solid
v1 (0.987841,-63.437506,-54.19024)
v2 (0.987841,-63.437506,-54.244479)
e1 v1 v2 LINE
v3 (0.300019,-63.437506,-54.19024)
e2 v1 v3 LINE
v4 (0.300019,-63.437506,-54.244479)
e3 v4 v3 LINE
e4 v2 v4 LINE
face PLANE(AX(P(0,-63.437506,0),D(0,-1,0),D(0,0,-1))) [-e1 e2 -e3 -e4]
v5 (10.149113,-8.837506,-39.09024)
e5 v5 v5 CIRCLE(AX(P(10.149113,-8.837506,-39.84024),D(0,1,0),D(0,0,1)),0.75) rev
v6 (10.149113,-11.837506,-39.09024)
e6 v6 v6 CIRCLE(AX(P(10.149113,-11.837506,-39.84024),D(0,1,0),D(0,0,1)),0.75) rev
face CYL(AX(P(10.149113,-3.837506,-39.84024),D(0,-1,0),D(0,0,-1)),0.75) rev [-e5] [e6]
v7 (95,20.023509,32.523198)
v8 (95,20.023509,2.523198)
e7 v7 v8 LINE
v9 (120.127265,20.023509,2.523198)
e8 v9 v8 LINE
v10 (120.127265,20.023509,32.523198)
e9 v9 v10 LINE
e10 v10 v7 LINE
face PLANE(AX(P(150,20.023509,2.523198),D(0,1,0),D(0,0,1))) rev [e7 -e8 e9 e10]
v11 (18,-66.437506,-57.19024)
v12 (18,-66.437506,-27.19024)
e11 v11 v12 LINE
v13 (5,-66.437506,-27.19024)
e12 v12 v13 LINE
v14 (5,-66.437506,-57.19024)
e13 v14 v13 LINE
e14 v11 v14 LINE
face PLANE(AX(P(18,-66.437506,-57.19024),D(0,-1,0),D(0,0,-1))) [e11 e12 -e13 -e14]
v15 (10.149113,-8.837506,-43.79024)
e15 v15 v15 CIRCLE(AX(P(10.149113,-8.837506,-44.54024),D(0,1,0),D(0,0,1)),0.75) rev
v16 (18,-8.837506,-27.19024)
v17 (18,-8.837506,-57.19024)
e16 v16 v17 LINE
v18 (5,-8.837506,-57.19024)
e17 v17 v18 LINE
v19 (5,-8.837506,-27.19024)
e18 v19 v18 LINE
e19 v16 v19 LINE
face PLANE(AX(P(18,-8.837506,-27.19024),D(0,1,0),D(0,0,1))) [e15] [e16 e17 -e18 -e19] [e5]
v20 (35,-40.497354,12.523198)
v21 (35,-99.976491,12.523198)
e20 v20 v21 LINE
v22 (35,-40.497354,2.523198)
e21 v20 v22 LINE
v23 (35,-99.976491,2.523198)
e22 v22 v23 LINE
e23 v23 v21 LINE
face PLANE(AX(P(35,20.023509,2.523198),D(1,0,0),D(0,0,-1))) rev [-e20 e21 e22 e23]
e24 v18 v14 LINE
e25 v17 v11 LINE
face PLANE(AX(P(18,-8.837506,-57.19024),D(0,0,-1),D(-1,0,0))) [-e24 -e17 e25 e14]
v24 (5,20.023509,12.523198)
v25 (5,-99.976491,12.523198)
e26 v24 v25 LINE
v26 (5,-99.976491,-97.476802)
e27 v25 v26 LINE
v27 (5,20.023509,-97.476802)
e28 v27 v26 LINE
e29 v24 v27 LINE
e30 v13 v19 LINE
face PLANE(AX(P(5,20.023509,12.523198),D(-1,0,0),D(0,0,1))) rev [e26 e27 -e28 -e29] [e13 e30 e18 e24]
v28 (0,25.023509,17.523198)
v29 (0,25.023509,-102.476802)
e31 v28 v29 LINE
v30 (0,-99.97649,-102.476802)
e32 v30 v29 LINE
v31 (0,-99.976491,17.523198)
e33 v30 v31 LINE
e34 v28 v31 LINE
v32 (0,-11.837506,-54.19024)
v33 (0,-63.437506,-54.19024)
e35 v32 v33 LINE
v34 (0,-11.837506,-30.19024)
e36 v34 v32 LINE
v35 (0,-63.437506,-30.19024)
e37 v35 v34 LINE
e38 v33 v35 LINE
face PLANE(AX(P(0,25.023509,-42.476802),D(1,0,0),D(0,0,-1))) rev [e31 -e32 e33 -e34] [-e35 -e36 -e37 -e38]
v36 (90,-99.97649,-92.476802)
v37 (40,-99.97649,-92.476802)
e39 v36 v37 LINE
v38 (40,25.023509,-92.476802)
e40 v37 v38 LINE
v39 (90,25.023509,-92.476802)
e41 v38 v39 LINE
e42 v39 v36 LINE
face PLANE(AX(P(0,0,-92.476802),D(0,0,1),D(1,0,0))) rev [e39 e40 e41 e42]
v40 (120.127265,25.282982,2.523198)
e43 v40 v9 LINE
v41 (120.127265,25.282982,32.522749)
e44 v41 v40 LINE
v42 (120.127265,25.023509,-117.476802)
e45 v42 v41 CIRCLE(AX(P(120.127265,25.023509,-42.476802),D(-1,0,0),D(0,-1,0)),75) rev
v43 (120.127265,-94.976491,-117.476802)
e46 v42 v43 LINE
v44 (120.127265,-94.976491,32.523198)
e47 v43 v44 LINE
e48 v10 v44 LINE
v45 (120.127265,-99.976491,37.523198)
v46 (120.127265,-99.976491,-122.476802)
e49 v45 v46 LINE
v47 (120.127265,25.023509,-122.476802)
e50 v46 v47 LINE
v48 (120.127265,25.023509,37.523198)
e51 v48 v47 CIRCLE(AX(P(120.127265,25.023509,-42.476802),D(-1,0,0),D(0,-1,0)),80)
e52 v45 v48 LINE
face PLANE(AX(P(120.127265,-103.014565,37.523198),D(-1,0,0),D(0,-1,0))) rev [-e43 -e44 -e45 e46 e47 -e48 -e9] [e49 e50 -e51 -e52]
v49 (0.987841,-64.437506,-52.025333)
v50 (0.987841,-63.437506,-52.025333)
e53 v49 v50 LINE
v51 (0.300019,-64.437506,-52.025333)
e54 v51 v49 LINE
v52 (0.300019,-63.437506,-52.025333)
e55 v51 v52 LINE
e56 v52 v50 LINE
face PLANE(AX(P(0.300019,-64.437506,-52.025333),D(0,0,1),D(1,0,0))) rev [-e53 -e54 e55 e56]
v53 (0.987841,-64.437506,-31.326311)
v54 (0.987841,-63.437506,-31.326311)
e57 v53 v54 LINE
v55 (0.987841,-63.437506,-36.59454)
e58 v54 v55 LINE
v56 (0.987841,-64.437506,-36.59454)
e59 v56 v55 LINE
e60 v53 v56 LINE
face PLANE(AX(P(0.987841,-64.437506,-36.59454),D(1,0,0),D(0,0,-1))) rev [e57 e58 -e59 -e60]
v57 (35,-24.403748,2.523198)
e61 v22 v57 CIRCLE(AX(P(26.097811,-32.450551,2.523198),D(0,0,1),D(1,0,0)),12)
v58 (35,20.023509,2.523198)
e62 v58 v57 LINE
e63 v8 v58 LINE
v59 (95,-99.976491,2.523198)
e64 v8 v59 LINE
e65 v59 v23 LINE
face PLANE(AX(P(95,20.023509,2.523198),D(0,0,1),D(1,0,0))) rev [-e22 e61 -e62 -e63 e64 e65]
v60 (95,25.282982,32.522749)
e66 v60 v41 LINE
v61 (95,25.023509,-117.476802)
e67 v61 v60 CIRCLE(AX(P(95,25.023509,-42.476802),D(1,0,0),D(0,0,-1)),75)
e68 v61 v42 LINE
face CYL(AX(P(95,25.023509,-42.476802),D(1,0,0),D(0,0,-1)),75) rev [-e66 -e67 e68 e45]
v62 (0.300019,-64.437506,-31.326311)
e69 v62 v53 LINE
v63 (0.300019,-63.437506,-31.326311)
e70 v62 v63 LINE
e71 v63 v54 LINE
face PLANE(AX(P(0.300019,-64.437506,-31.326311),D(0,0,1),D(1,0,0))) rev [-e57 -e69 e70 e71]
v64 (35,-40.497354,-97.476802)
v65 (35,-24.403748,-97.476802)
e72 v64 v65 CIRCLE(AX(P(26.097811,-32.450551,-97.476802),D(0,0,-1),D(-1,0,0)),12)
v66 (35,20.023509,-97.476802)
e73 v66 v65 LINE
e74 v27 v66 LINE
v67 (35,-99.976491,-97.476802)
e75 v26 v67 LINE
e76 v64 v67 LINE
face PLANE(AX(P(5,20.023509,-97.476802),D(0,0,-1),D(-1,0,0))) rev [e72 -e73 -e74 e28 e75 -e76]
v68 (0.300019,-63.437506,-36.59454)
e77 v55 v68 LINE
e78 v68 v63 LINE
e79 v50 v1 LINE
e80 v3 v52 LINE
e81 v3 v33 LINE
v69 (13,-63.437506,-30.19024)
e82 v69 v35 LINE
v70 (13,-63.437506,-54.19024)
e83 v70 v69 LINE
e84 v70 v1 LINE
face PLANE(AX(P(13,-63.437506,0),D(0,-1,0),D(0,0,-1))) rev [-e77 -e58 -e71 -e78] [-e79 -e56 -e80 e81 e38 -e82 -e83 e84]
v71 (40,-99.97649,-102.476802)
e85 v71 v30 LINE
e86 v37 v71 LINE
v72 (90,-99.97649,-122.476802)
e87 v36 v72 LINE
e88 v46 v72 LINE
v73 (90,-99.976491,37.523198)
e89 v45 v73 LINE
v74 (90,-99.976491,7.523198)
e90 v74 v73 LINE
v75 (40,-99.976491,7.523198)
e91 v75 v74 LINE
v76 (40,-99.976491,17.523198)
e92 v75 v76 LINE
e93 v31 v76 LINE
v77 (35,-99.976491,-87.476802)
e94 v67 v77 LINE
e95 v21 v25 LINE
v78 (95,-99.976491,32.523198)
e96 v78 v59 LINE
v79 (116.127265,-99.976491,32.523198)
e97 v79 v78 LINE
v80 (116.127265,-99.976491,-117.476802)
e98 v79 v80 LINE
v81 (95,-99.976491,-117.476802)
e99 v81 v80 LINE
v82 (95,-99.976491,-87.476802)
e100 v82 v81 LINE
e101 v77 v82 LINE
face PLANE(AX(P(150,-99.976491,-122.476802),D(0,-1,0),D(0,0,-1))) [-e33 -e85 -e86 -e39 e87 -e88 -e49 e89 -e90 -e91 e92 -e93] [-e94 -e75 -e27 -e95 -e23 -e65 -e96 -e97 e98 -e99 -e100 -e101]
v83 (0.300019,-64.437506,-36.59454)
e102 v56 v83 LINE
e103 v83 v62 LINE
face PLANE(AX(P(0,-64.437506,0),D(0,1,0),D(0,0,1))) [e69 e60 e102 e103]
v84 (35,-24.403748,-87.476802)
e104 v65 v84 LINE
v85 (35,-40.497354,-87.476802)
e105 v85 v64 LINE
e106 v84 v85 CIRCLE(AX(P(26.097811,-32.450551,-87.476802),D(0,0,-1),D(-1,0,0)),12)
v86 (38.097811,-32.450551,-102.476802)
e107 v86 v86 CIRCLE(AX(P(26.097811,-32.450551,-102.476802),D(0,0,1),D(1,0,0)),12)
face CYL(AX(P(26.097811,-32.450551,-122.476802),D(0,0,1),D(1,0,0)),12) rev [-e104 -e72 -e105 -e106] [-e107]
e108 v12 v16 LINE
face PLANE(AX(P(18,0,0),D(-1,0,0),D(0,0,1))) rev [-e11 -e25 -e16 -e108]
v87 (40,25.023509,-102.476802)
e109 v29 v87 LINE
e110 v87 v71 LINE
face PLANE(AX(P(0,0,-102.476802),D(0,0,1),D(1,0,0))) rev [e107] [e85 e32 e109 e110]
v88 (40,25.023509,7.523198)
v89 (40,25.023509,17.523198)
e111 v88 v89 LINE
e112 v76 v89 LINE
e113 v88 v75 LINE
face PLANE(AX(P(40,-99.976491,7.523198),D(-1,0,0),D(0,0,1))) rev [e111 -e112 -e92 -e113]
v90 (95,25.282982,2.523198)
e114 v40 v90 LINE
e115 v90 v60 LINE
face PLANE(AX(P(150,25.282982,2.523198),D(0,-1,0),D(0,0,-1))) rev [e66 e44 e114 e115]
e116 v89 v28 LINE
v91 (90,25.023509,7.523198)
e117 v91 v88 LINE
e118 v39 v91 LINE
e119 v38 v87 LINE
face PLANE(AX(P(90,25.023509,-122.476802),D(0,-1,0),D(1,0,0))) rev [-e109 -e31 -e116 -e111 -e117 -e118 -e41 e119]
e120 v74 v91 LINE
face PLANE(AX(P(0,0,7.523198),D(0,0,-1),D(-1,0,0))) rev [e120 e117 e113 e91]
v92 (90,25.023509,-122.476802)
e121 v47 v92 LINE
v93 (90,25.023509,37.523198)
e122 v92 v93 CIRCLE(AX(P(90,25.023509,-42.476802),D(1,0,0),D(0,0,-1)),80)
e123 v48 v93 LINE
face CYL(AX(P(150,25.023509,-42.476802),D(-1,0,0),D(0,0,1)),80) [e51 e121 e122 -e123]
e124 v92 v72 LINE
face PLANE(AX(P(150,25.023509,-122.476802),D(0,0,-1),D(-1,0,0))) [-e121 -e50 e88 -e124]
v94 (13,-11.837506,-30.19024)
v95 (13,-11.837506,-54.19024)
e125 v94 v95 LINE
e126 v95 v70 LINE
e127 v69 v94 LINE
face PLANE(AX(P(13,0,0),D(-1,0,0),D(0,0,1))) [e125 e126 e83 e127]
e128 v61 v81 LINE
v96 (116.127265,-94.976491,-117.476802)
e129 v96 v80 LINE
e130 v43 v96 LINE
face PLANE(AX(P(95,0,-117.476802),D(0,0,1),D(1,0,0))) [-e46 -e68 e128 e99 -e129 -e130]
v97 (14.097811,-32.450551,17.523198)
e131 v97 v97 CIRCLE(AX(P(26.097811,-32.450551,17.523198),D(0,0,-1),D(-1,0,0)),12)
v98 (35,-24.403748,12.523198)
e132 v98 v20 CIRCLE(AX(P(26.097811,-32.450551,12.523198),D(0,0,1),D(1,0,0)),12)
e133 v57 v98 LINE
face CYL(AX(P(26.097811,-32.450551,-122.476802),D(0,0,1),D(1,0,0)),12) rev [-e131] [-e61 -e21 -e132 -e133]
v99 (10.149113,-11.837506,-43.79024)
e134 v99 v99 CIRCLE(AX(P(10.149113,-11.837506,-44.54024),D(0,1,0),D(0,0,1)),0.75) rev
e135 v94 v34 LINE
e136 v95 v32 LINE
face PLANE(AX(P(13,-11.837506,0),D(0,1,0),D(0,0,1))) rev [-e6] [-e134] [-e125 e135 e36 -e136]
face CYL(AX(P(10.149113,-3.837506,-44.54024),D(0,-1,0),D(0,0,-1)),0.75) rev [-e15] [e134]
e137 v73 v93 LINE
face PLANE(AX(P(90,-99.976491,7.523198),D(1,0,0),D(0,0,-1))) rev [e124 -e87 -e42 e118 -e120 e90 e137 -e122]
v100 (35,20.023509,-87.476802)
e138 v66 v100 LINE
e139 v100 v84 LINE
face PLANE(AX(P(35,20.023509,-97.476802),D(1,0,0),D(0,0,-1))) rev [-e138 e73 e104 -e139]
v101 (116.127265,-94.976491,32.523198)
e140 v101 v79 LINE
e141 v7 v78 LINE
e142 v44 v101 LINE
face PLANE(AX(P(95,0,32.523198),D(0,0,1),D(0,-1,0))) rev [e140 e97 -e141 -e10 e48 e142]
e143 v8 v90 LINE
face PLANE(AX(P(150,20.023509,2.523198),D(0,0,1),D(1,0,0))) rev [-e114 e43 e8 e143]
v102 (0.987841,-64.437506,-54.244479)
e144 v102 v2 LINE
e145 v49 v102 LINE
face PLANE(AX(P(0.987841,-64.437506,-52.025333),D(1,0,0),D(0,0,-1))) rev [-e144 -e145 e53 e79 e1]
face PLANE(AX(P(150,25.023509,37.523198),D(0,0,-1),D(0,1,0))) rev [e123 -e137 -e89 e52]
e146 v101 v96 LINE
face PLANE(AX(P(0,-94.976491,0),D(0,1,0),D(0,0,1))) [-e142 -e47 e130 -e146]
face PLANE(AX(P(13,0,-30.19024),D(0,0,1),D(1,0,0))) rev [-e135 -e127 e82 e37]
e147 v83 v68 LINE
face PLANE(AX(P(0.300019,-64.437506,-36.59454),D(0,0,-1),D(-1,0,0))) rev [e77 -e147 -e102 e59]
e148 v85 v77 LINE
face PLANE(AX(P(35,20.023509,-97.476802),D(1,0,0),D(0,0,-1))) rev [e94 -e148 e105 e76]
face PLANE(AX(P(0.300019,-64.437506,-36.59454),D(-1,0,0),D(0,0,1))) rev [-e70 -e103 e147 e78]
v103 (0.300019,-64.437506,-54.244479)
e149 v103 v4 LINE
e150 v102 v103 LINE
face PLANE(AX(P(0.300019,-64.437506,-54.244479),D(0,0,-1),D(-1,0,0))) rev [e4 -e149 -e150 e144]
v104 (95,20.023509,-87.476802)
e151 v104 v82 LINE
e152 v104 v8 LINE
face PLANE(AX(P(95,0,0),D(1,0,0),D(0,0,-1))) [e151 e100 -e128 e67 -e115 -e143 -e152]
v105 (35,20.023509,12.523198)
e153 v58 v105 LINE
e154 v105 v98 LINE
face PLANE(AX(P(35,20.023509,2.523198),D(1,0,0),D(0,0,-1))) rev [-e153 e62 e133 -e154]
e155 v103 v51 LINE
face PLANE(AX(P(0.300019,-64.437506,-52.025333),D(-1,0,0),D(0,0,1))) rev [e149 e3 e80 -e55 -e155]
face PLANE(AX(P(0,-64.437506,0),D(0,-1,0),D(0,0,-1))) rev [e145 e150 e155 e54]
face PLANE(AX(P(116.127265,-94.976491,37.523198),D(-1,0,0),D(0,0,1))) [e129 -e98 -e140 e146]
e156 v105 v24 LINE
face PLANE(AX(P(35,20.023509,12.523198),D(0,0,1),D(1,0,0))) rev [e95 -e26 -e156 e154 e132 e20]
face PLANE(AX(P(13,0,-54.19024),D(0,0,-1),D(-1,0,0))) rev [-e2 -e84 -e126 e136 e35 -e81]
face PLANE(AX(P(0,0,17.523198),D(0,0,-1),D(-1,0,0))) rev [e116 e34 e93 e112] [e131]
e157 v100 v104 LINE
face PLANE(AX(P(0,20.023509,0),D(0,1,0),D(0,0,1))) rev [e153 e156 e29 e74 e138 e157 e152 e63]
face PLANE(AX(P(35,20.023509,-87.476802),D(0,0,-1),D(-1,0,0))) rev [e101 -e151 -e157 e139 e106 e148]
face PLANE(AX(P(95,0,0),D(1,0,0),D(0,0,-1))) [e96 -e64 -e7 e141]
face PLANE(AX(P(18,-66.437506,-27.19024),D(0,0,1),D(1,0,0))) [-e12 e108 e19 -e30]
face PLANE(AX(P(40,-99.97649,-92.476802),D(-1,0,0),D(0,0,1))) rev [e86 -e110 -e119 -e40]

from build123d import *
from OCP.BRepAlgoAPI import BRepAlgoAPI_Cut
from OCP.TopTools import TopTools_ListOfShape

# Parameters (mm, degrees)
BOSS_EXTRUDE2_DEPTH          = 150
SKETCH4_W                    = 40
SKETCH4_H                    = 124.999999274
CUT_EXTRUDE4_DEPTH           = 20
SKETCH8_W                    = 50
SKETCH8_H                    = 124.997967802
CUT_EXTRUDE8_DEPTH           = 30
CUT_EXTRUDE10_DEPTH          = 231.489840965
CUT_EXTRUDE10_DEPTH_BACK     = 231.489840965
CUT_EXTRUDE11_DEPTH          = 225.566109405
CUT_EXTRUDE11_DEPTH_BACK     = 225.566109405
SKETCH11_W                   = 112.022201576
SKETCH11_H                   = 106.194456985
CUT_EXTRUDE12_DEPTH          = 55
SKETCH13_W                   = 40
SKETCH13_H                   = 124.999999274
CUT_EXTRUDE13_DEPTH          = 20
SKETCH14_W                   = 50
SKETCH14_H                   = 124.999999274
CUT_EXTRUDE15_DEPTH          = 30
CUT_EXTRUDE17_DEPTH          = 120
SKETCH17_W                   = 30
SKETCH17_H                   = 5.259472701
BOSS_EXTRUDE3_DEPTH          = 55
CUT_EXTRUDE18_DEPTH          = 225.566109405
CUT_EXTRUDE18_DEPTH_BACK     = 225.566109405
SKETCH20_R                   = 12
CUT_EXTRUDE_THIN2_DEPTH      = 244.166481024
CUT_EXTRUDE_THIN2_DEPTH_BACK = 244.166481024
SKETCH21_W                   = 50
SKETCH21_H                   = 219.250605911
SKETCH22_W                   = 4
SKETCH22_H                   = 160
BOSS_EXTRUDE4_DEPTH          = 5
SKETCH25_W                   = 30
SKETCH25_H                   = 57.6
BOSS_EXTRUDE5_DEPTH          = 18
SKETCH25_4_W                 = 24
SKETCH25_4_H                 = 51.6
CUT_EXTRUDE19_DEPTH          = 13
SKETCH26_W                   = 0.687822724
SKETCH26_H                   = 5.268229282
SKETCH26_H_2                 = 2.219145295
CUT_EXTRUDE21_DEPTH          = 1
CUT_EXTRUDE22_DEPTH          = 5
CUT_EXTRUDE22_DEPTH_BACK     = 5
SKETCH28_R                   = 0.75


with BuildPart() as part:
    # Sketch1 → Boss-Extrude2 (new body)
    with BuildSketch(Plane(origin=(0, 0, 0), x_dir=(0, 0, -1), z_dir=(1, 0, 0))):
        with BuildLine():
            Line((-37.52319824, 25.023509242), (-37.52319824, -99.976490758))
            Line((-37.52319824, -99.976490758), (122.47680176, -99.976490758))
            Line((122.47680176, -99.976490758), (122.47680176, 25.023509242))
            ThreePointArc((122.47680176, 25.023509242), (42.47680176, 105.023509242), (-37.52319824, 25.023509242))
        make_face()
    extrude(amount=BOSS_EXTRUDE2_DEPTH)

    # Sketch4 → Cut-Extrude4 (cut)
    with BuildSketch(Plane.XY.offset(37.52319824)):
        with Locations((20, -37.476491121)):
            Rectangle(SKETCH4_W, SKETCH4_H)
    extrude(amount=-CUT_EXTRUDE4_DEPTH, mode=Mode.SUBTRACT)

    # Sketch8 → Cut-Extrude8 (cut)
    with BuildSketch(Plane.XY.offset(37.52319824)):
        with Locations((65, -37.477506857)):
            Rectangle(SKETCH8_W, SKETCH8_H)
    extrude(amount=-CUT_EXTRUDE8_DEPTH, mode=Mode.SUBTRACT)

    # Sketch9 → Cut-Extrude10 (cut, two sides: drawn at the far end of the back side and taken through both)
    with BuildSketch(Plane.XZ.offset(-25.023508516).offset(-CUT_EXTRUDE10_DEPTH_BACK)):
        Polygon((0, 37.52319824), (0, 17.52319824), (40, 17.52319824), (40, 7.52319824), (90, 7.52319824), (90, 37.52319824), align=None)
    extrude(amount=CUT_EXTRUDE10_DEPTH + CUT_EXTRUDE10_DEPTH_BACK, mode=Mode.SUBTRACT)

    # Sketch11 → Cut-Extrude11 (cut, two sides: drawn at the far end of the back side and taken through both)
    with BuildSketch(Plane.XY.offset(7.52319824).offset(-CUT_EXTRUDE11_DEPTH_BACK)):
        with Locations((33.988899212, 78.120737735)):
            Rectangle(SKETCH11_W, SKETCH11_H)
    extrude(amount=CUT_EXTRUDE11_DEPTH + CUT_EXTRUDE11_DEPTH_BACK, mode=Mode.SUBTRACT)

    # Sketch12 → Cut-Extrude12 (cut)
    with BuildSketch(Plane(origin=(150, 0, 0), x_dir=(0, 0, -1), z_dir=(1, 0, 0))):
        with BuildLine():
            ThreePointArc((117.47680176, 25.023509242), (42.47680176, 100.023509242), (-32.52319824, 25.023509242))
            Line((-32.52319824, 25.023509242), (-32.52319824, -94.976490758))
            Line((-32.52319824, -94.976490758), (117.47680176, -94.976490758))
            Line((117.47680176, -94.976490758), (117.47680176, 25.023509242))
        make_face()
    extrude(amount=-CUT_EXTRUDE12_DEPTH, mode=Mode.SUBTRACT)


with BuildPart() as cut_extrude13_tool:
    # Sketch13 → Cut-Extrude13 (new body)
    with BuildSketch(Plane(origin=(0, 0, -122.47680176), x_dir=(-1, 0, 0), z_dir=(0, 0, -1))):
        with Locations((-20, -37.476490395)):
            Rectangle(SKETCH13_W, SKETCH13_H)
    extrude(amount=-CUT_EXTRUDE13_DEPTH)


with BuildPart() as part_1:
    add(part.part)

    # Cut-Extrude13: cut by cut_extrude13_tool, with a tolerance
    cut_extrude13_stock = TopTools_ListOfShape()
    cut_extrude13_stock.Append(part_1.part.wrapped)
    cut_extrude13_tools = TopTools_ListOfShape()
    cut_extrude13_tools.Append(cut_extrude13_tool.part.wrapped)
    cut_extrude13_cut = BRepAlgoAPI_Cut()
    cut_extrude13_cut.SetArguments(cut_extrude13_stock)
    cut_extrude13_cut.SetTools(cut_extrude13_tools)
    cut_extrude13_cut.SetFuzzyValue(0.00001)
    cut_extrude13_cut.Build()
    add(Compound.cast(cut_extrude13_cut.Shape()).solids(), mode=Mode.REPLACE)


with BuildPart() as cut_extrude15_tool:
    # Sketch14 → Cut-Extrude15 (new body)
    with BuildSketch(Plane(origin=(0, 0, -122.47680176), x_dir=(-1, 0, 0), z_dir=(0, 0, -1))):
        with Locations((-65, -37.476490395)):
            Rectangle(SKETCH14_W, SKETCH14_H)
    extrude(amount=-CUT_EXTRUDE15_DEPTH)


with BuildPart() as part_2:
    add(part_1.part)

    # Cut-Extrude15: cut by cut_extrude15_tool, with a tolerance
    cut_extrude15_stock = TopTools_ListOfShape()
    cut_extrude15_stock.Append(part_2.part.wrapped)
    cut_extrude15_tools = TopTools_ListOfShape()
    cut_extrude15_tools.Append(cut_extrude15_tool.part.wrapped)
    cut_extrude15_cut = BRepAlgoAPI_Cut()
    cut_extrude15_cut.SetArguments(cut_extrude15_stock)
    cut_extrude15_cut.SetTools(cut_extrude15_tools)
    cut_extrude15_cut.SetFuzzyValue(0.00001)
    cut_extrude15_cut.Build()
    add(Compound.cast(cut_extrude15_cut.Shape()).solids(), mode=Mode.REPLACE)

    # Sketch16 → Cut-Extrude17 (cut)
    with BuildSketch(Plane.XZ.offset(99.976490758)):
        Polygon((95, -87.47680176), (95, -117.47680176), (145, -117.47680176), (145, 32.52319824), (95, 32.52319824), (95, 2.52319824), (35, 2.52319824), (35, 12.52319824), (5, 12.52319824), (5, -97.47680176), (35, -97.47680176), (35, -87.47680176), align=None)
    extrude(amount=-CUT_EXTRUDE17_DEPTH, mode=Mode.SUBTRACT)

    # Sketch17 → Boss-Extrude3 (add)
    with BuildSketch(Plane(origin=(95, 0, 0), x_dir=(0, 0, -1), z_dir=(1, 0, 0))):
        with Locations((-17.52319824, 22.653245593)):
            Rectangle(SKETCH17_W, SKETCH17_H)
    extrude(amount=BOSS_EXTRUDE3_DEPTH)

    # Sketch20 → Cut-Extrude18 (cut, two sides: drawn at the far end of the back side and taken through both)
    with BuildSketch(Plane.XY.offset(7.52319824).offset(-CUT_EXTRUDE18_DEPTH_BACK)):
        with Locations((26.097811204, -32.450551048)):
            Circle(SKETCH20_R)
    extrude(amount=CUT_EXTRUDE18_DEPTH + CUT_EXTRUDE18_DEPTH_BACK, mode=Mode.SUBTRACT)

    # Sketch21 → Cut-Extrude-Thin2 (cut, two sides: drawn at the far end of the back side and taken through both)
    with BuildSketch(Plane(origin=(0, 0, -122.47680176), x_dir=(-1, 0, 0), z_dir=(0, 0, -1)).offset(-CUT_EXTRUDE_THIN2_DEPTH_BACK)):
        with Locations((-145.127265144, 6.610737582)):
            Rectangle(SKETCH21_W, SKETCH21_H)
    extrude(amount=CUT_EXTRUDE_THIN2_DEPTH + CUT_EXTRUDE_THIN2_DEPTH_BACK, mode=Mode.SUBTRACT)

    # Sketch22 → Boss-Extrude4 (add)
    with BuildSketch(Plane.XZ.offset(99.976490758)):
        with Locations((118.127265144, -42.47680176)):
            Rectangle(SKETCH22_W, SKETCH22_H)
    extrude(amount=-BOSS_EXTRUDE4_DEPTH)

    # Sketch25 → Boss-Extrude5 (add)
    with BuildSketch(Plane.ZY):
        with Locations((-42.190239987, -37.637506258)):
            Rectangle(SKETCH25_W, SKETCH25_H)
    extrude(amount=-BOSS_EXTRUDE5_DEPTH)

    # Sketch25<4> → Cut-Extrude19 (cut)
    with BuildSketch(Plane.ZY):
        with Locations((-42.190239987, -37.637506258)):
            Rectangle(SKETCH25_4_W, SKETCH25_4_H)
    extrude(amount=-CUT_EXTRUDE19_DEPTH, mode=Mode.SUBTRACT)

    # Sketch26 → Cut-Extrude21 (cut)
    with BuildSketch(Plane(origin=(0, -63.437506258, 0), x_dir=(1, 0, 0), z_dir=(0, 1, 0))):
        with Locations((0.643930004, 33.960425166)):
            Rectangle(SKETCH26_W, SKETCH26_H)
        with Locations((0.643930004, 53.134905876)):
            Rectangle(SKETCH26_W, SKETCH26_H_2)
    extrude(amount=-CUT_EXTRUDE21_DEPTH, mode=Mode.SUBTRACT)

    # Sketch28 → Cut-Extrude22 (cut, two sides: drawn at the far end of the back side and taken through both)
    with BuildSketch(Plane(origin=(0, -8.837506258, 0), x_dir=(1, 0, 0), z_dir=(0, 1, 0)).offset(-CUT_EXTRUDE22_DEPTH_BACK)):
        with Locations((10.149113082, 44.540239987)):
            Circle(SKETCH28_R)
        with Locations((10.149113082, 39.840239987)):
            Circle(SKETCH28_R)
    extrude(amount=CUT_EXTRUDE22_DEPTH + CUT_EXTRUDE22_DEPTH_BACK, mode=Mode.SUBTRACT)


solid = part_2.part
